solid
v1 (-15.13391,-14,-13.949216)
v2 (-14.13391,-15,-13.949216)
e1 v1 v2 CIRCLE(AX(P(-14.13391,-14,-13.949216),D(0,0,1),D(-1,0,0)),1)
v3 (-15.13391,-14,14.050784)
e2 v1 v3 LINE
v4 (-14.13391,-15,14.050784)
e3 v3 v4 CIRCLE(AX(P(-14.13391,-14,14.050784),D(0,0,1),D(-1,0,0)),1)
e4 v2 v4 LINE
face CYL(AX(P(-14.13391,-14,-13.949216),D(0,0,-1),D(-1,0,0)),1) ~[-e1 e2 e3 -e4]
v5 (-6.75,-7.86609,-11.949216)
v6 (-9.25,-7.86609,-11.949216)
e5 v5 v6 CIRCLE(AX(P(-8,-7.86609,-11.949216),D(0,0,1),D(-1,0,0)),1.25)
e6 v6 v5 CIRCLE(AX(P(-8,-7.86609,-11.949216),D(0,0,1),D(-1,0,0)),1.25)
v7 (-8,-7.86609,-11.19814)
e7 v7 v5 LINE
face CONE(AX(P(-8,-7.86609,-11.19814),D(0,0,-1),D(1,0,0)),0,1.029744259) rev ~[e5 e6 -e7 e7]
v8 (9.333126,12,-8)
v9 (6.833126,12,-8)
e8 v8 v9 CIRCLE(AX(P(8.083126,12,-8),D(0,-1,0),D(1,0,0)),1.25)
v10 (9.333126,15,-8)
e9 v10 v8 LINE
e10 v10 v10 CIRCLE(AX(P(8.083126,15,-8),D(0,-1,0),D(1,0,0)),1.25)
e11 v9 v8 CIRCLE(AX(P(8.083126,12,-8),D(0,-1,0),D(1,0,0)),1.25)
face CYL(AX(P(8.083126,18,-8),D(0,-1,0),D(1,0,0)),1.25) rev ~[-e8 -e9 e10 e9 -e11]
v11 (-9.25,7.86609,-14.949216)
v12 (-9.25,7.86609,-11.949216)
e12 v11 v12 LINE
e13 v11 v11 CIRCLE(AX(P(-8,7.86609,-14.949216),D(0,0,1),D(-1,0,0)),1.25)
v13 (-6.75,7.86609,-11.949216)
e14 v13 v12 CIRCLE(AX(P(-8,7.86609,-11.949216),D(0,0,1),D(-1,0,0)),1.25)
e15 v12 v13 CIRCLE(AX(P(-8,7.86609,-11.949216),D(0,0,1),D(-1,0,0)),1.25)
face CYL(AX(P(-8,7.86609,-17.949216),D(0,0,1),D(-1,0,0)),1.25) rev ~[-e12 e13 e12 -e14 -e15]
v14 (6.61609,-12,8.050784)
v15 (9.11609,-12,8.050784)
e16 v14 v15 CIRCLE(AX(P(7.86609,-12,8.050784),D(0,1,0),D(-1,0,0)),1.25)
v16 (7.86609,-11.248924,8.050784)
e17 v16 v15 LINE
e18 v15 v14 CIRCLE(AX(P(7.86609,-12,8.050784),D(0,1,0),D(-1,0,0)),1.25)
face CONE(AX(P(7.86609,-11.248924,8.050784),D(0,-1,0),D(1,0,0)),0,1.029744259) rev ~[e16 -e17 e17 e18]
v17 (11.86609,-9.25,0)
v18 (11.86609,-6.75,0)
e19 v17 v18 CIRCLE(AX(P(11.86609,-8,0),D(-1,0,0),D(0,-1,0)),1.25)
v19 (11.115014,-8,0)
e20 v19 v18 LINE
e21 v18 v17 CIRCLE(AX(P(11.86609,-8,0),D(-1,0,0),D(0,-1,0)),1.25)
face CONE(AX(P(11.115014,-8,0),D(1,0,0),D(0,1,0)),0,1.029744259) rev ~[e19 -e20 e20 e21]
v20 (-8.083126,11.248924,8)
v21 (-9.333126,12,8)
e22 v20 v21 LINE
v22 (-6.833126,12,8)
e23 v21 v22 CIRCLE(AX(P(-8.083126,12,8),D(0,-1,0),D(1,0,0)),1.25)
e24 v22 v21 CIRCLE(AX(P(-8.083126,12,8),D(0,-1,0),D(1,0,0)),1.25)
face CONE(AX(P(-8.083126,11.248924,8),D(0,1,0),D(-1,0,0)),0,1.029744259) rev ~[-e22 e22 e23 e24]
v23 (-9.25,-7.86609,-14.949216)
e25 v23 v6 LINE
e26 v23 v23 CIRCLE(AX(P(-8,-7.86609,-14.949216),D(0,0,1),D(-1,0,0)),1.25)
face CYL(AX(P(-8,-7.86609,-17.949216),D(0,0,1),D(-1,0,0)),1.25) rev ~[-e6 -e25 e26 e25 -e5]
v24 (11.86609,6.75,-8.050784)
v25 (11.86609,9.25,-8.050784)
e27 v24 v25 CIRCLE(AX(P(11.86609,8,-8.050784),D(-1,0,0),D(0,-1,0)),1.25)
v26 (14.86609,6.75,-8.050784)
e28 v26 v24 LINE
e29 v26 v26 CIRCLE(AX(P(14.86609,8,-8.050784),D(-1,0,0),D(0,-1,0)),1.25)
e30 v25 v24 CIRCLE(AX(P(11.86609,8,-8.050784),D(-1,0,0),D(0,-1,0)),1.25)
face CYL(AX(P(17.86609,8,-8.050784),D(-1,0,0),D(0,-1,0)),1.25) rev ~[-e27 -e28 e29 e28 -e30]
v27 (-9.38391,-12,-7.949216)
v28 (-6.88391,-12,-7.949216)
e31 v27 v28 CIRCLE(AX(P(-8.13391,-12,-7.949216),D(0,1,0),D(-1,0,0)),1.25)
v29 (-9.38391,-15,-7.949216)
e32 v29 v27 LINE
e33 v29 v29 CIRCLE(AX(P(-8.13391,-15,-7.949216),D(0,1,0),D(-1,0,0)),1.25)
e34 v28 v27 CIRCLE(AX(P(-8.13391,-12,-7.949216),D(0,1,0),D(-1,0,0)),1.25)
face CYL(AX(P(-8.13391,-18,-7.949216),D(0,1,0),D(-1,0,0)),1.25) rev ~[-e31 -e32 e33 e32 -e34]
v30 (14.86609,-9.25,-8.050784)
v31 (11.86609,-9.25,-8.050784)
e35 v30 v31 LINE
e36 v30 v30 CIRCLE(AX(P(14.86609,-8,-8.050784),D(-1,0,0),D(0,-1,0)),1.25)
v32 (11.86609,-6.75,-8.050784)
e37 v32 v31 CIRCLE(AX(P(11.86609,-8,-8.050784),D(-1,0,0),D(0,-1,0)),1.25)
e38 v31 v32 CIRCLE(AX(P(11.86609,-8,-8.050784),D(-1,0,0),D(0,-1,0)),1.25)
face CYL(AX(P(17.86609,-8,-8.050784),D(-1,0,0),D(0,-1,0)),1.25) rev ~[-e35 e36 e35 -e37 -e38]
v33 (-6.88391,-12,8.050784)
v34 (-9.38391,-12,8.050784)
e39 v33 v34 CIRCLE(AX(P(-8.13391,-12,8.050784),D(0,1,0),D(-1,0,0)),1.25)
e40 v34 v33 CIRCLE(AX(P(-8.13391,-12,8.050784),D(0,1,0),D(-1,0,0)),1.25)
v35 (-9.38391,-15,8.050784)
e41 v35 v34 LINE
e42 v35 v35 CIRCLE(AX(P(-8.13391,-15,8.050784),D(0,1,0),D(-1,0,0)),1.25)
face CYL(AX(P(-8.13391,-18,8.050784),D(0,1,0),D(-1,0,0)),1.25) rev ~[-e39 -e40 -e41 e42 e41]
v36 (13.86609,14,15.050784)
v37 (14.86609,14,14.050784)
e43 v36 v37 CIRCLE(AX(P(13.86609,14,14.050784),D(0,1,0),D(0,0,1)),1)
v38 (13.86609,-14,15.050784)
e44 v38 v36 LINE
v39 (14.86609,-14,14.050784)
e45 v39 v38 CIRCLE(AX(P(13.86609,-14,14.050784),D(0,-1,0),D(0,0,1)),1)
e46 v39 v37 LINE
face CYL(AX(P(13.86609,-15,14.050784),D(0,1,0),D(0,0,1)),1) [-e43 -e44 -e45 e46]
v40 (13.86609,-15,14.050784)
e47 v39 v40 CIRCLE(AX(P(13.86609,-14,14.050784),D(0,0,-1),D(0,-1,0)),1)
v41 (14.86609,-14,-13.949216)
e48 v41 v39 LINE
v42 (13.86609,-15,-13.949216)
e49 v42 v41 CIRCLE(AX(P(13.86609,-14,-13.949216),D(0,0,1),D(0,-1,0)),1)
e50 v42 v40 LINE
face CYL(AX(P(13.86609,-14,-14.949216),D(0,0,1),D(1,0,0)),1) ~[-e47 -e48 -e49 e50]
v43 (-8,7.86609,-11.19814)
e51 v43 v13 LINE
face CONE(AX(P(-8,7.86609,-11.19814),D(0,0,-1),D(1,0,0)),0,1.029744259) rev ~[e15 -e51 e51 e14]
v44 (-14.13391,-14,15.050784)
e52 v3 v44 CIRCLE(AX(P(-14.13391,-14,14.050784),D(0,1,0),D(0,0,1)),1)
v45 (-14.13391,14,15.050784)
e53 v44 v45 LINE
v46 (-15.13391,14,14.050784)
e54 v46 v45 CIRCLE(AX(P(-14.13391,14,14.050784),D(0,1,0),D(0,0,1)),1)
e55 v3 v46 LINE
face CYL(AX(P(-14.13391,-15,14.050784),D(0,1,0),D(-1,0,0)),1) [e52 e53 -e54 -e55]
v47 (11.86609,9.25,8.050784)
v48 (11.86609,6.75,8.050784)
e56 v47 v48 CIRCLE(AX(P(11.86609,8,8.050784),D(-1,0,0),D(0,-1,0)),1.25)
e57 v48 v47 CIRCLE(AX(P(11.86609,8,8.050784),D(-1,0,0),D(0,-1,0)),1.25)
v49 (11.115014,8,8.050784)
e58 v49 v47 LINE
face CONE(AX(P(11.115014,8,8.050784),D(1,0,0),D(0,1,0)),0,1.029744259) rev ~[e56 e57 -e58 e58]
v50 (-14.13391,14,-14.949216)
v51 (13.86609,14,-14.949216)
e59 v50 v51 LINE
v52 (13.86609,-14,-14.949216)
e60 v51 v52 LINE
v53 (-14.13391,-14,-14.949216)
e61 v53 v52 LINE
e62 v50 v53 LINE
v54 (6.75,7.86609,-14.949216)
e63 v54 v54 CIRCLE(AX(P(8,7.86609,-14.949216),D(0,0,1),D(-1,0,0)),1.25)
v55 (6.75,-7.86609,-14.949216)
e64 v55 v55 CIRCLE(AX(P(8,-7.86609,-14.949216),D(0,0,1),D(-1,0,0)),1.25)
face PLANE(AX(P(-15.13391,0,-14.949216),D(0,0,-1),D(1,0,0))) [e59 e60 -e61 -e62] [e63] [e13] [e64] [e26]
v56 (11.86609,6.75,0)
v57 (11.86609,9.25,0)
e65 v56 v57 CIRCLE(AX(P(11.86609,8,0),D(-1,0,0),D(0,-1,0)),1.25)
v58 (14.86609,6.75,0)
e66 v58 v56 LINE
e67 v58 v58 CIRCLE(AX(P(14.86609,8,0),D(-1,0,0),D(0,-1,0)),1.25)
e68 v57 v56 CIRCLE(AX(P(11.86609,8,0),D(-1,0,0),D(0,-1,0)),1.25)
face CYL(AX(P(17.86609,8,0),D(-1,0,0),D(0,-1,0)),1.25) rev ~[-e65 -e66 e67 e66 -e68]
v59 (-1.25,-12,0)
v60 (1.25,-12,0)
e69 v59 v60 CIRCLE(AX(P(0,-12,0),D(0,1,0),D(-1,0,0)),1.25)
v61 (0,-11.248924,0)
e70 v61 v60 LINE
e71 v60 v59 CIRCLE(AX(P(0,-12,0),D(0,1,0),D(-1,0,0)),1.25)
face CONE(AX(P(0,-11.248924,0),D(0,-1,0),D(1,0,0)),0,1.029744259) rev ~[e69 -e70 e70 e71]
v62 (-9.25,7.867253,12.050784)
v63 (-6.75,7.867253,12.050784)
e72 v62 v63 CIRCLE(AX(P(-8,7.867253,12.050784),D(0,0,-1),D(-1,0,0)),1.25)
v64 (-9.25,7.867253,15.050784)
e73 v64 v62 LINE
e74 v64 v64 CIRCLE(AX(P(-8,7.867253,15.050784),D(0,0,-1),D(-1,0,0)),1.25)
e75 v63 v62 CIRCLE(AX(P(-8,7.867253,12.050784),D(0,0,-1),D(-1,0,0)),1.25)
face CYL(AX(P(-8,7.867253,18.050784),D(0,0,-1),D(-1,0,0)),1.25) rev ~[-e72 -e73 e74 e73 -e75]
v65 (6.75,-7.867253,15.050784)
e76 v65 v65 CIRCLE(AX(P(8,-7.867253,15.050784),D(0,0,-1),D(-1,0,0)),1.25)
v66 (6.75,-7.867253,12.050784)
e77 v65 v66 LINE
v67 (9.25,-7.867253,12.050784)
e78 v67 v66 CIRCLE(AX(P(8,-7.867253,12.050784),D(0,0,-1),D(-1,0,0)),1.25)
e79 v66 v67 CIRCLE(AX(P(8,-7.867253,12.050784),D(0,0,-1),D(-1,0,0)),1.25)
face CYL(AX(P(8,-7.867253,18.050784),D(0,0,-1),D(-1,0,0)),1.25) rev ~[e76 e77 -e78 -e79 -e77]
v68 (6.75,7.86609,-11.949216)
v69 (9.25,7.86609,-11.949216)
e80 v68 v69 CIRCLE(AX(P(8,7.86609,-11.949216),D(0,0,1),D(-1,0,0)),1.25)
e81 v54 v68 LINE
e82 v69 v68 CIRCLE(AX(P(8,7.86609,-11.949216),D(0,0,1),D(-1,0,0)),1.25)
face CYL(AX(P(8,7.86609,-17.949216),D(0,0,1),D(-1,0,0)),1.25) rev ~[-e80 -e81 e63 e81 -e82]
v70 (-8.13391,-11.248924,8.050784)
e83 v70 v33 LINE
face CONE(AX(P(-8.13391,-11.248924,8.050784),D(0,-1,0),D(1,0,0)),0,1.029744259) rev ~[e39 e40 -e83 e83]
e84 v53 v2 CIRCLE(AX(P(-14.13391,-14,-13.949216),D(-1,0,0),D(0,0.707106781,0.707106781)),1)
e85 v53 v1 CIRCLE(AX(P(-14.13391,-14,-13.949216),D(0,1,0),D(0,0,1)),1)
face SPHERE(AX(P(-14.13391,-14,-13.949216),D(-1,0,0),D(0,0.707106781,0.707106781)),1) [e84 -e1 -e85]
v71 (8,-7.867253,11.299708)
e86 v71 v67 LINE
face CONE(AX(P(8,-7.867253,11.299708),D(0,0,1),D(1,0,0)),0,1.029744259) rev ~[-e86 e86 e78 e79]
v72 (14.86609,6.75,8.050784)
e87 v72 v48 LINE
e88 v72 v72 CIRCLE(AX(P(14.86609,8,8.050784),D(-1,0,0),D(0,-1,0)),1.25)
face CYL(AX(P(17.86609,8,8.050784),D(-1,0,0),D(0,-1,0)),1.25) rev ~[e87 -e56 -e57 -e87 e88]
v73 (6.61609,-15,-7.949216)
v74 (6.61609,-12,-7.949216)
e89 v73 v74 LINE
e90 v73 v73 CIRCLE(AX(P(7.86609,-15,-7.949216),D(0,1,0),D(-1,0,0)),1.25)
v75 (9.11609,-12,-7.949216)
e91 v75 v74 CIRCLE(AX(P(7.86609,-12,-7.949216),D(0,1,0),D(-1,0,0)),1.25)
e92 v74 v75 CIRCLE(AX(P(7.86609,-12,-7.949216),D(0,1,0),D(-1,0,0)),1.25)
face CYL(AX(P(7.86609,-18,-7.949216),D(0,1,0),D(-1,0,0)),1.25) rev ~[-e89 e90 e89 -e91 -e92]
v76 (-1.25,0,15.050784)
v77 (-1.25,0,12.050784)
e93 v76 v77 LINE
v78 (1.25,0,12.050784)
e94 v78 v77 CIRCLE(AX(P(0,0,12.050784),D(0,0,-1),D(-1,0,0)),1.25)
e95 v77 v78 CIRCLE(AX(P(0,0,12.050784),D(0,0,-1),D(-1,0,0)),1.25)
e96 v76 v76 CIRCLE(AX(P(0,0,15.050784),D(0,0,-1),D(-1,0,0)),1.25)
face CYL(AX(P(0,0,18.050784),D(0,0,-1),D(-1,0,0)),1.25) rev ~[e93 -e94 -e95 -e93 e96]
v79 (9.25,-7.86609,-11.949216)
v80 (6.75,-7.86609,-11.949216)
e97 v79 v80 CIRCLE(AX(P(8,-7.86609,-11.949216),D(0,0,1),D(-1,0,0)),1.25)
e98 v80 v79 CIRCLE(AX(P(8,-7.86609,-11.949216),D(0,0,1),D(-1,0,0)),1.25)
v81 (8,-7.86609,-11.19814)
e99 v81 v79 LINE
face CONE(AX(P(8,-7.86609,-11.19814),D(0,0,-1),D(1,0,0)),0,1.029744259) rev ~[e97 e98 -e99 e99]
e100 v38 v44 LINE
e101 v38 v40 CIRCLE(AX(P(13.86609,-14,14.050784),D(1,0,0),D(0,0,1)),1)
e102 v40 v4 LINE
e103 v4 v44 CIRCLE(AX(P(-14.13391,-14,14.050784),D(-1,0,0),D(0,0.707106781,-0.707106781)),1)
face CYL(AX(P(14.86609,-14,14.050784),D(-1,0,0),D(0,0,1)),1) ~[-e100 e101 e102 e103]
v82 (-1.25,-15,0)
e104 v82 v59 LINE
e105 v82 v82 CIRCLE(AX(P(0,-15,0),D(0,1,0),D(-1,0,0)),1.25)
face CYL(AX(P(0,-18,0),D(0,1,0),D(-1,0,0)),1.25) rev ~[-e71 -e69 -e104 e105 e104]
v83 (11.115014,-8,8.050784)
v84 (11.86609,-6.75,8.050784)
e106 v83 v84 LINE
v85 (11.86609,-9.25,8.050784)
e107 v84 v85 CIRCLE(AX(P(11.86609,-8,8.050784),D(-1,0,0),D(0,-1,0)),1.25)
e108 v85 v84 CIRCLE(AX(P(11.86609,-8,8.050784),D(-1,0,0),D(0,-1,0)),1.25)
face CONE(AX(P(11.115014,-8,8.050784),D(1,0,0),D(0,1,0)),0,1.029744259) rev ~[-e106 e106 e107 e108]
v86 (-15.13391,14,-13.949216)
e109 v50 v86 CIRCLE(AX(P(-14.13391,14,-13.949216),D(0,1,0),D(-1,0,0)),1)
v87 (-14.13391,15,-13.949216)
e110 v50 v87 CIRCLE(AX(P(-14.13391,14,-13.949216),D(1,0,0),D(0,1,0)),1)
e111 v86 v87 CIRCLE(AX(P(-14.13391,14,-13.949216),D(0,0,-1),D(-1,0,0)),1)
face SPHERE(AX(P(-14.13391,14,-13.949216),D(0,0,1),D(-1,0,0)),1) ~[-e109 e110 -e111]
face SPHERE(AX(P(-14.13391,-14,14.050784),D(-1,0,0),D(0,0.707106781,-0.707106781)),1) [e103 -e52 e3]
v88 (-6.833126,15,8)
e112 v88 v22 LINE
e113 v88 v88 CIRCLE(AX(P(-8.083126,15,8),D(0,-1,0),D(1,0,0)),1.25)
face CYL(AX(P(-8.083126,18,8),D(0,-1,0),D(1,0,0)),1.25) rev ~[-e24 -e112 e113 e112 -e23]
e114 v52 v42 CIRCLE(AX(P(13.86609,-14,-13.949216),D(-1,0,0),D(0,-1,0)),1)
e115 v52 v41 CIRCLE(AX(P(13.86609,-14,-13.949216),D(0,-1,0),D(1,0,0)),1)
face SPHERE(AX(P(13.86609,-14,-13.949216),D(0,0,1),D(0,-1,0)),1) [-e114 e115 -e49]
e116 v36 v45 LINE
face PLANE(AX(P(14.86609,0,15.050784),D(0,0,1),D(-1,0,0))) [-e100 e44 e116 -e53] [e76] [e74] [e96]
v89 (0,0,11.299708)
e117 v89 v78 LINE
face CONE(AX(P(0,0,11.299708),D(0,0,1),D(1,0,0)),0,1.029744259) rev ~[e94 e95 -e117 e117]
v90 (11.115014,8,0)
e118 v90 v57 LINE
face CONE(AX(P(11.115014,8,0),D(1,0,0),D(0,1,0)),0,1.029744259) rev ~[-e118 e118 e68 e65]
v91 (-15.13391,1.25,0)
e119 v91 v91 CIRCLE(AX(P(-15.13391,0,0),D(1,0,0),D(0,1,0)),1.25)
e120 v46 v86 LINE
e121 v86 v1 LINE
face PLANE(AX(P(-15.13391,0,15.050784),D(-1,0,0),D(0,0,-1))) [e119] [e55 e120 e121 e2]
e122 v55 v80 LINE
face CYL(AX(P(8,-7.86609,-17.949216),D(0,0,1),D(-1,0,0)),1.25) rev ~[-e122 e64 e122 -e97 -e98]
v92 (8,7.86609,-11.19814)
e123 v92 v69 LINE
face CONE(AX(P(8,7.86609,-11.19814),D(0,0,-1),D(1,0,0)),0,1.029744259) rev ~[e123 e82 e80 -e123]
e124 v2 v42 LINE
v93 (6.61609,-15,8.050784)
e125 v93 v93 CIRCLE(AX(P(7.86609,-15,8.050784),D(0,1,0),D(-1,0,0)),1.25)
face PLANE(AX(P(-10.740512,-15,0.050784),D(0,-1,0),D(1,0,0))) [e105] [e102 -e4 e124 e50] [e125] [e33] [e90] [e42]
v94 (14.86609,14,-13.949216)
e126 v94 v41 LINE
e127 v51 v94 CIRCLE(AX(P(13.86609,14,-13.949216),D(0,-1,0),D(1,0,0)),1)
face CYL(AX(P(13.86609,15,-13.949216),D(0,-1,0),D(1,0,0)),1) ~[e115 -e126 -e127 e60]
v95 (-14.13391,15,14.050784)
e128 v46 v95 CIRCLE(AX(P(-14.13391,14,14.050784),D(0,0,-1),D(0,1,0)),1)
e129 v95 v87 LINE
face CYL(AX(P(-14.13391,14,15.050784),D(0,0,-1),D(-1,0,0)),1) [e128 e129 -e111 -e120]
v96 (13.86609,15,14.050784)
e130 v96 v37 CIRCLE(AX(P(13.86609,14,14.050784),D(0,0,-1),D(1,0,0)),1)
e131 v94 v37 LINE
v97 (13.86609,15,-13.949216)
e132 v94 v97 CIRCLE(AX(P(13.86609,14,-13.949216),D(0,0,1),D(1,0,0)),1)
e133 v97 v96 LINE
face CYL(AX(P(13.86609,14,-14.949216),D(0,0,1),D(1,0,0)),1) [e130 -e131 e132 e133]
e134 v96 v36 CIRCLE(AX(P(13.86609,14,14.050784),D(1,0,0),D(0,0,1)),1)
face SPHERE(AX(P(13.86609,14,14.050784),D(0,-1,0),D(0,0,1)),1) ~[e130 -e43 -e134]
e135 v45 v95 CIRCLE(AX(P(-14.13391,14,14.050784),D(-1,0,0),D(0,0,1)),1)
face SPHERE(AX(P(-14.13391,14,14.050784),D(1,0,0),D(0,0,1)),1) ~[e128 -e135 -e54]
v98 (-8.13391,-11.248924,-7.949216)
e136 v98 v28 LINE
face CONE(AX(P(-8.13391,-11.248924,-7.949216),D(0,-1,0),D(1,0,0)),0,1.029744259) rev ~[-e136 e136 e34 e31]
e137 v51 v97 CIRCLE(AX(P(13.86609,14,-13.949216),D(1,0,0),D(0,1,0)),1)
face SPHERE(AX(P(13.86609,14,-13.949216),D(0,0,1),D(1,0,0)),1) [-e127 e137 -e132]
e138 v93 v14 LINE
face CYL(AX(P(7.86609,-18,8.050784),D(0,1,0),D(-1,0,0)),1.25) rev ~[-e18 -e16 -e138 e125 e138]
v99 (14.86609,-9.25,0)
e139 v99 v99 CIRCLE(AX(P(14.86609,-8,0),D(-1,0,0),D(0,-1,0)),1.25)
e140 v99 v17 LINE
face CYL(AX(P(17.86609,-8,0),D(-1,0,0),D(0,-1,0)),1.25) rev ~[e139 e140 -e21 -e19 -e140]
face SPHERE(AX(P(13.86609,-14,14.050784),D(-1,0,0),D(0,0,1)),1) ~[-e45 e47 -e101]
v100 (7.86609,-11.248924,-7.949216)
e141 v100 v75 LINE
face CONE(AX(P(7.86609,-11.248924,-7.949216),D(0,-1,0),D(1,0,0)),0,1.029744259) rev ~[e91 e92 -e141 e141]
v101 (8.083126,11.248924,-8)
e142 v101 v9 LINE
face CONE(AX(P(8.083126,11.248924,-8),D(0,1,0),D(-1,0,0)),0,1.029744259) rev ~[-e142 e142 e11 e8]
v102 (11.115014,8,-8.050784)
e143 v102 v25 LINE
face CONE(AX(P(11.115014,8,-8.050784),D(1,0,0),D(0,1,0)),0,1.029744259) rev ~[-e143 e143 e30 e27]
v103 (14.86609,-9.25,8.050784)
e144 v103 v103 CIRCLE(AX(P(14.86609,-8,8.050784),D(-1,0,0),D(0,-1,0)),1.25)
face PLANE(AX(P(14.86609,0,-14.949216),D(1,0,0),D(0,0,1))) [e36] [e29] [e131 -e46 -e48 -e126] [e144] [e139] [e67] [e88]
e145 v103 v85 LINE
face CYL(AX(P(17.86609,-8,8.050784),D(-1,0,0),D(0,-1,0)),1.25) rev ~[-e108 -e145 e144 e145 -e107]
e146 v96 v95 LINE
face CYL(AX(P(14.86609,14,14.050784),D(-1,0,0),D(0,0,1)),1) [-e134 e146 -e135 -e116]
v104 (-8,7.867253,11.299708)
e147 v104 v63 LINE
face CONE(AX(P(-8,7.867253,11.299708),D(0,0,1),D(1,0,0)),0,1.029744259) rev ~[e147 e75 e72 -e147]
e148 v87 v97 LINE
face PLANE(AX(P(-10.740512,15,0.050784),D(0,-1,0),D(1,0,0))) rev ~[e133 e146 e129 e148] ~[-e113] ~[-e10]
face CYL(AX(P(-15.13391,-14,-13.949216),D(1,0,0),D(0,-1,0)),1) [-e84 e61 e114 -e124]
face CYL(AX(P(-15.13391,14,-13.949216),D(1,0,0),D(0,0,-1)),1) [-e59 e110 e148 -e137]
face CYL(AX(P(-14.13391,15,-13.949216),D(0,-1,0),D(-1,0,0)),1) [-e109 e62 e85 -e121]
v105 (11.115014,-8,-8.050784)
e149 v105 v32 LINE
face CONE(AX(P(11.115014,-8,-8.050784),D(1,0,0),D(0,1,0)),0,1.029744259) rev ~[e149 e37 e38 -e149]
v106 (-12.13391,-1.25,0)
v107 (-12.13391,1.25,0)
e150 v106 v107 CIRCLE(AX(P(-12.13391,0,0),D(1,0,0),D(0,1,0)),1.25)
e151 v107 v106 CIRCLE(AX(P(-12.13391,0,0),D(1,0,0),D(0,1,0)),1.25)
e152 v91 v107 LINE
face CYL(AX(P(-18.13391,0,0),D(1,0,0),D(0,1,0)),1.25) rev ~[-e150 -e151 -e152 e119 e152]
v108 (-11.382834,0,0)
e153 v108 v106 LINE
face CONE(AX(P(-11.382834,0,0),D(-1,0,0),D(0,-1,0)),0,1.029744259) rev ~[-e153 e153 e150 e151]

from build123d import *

# Parameters (mm, degrees)
F1_DEPTH     = 15
F2_R         = 1
F3_T1_DEPTH  = 28
F3_S5_W      = 1
F3_S5_H      = 1
F3_T6_DEPTH  = 1
F3_S11_W     = 1
F3_S11_H     = 1
F3_T12_DEPTH = 1
F10_D        = 2.5
F10_DEPTH    = 3
F10_TIP      = 0.7510757738
F11_D        = 2.5
F11_DEPTH    = 3
F11_TIP      = 0.7510757738
F12_D        = 2.5
F12_DEPTH    = 3
F12_TIP      = 0.7510757738
F13_D        = 2.5
F13_DEPTH    = 3
F13_TIP      = 0.7510757738
F14_D        = 2.5
F14_DEPTH    = 3
F14_TIP      = 0.7510757738
F15_D        = 2.5
F15_DEPTH    = 3
F15_TIP      = 0.7510757738


# Not quite as in the source:
# - a fillet or chamfer that OpenCascade refuses, or shapes differently, is made with other operations: its cross-section is extruded or revolved along the edge and cut away or added


with BuildPart() as f1:
    # F0 (on Front) → F1 (new body, symmetric)
    with BuildSketch(Plane.XZ):
        Polygon((-0.1339098811, 0.0507837534), (-15.1339098811, 15.0507837534), (-15.1339098811, -14.9492162466), align=None)
        Polygon((14.8660901189, 15.0507837534), (-15.1339098811, 15.0507837534), (-0.1339098811, 0.0507837534), align=None)
        Polygon((14.8660901189, -14.9492162466), (14.8660901189, 15.0507837534), (-0.1339098811, 0.0507837534), align=None)
        Polygon((-0.1339098811, 0.0507837534), (-15.1339098811, -14.9492162466), (14.8660901189, -14.9492162466), align=None)
    extrude(amount=F1_DEPTH, both=True)

    # F2
    f2_edges = [f1.edges().sort_by_distance(p)[0] for p in [
        (-0.13391, -15, 15.050784),
        (14.86609, 0, 15.050784),
        (-0.13391, 15, 15.050784),
        (-15.13391, 0, 15.050784),
        (-15.13391, 15, 0.050784),
        (14.86609, 15, 0.050784),
        (14.86609, -15, 0.050784),
        (-0.13391, -15, -14.949216),
        (14.86609, 0, -14.949216),
        (-15.13391, 0, -14.949216),
        (-0.13391, 15, -14.949216),
    ]]
    fillet(f2_edges, radius=F2_R)

    # F3: fillet of radius 1 on 1 edges, made by hand

    # F3_s2 → F3_t1 (cut)
    with BuildSketch(Plane.XY.offset(-13.9492162466)):
        with BuildLine():
            ThreePointArc((-15.1339098811, -14), (-14.8410166623, -14.7071067812), (-14.1339098811, -15))
            Line((-14.1339098811, -15), (-15.1339098811, -15))
            Line((-15.1339098811, -15), (-15.1339098811, -14))
        make_face()
    extrude(amount=F3_T1_DEPTH, mode=Mode.SUBTRACT)


with BuildPart() as f3_tool4:
    # F3_s5 → F3_t6 (new body)
    with BuildSketch(Plane.YZ.offset(-14.1339098811)):
        with Locations((-14.5, 14.5507837534)):
            Rectangle(F3_S5_W, F3_S5_H)
    extrude(amount=-F3_T6_DEPTH)

    # F3_s7 → F3_t8 (revolve, cut)
    with BuildSketch(Plane(origin=(-14.1339098811, -14, 14.0507837534), x_dir=(0, 0.7071067812, -0.7071067812), z_dir=(0, 0.7071067812, 0.7071067812))):
        with BuildLine():
            ThreePointArc((0, -1), (1, 0), (0, 1))
            Line((0, 1), (0, -1))
        make_face()
    revolve(axis=Axis((-14.1339098811, -14, 14.0507837534), (-1, 0, 0)), mode=Mode.SUBTRACT)


with BuildPart() as f1_1:
    add(f1.part)

    # F3_t3: cut F3_tool4
    add(f3_tool4.part, mode=Mode.SUBTRACT)


with BuildPart() as f3_tool10:
    # F3_s11 → F3_t12 (new body)
    with BuildSketch(Plane.YZ.offset(-14.1339098811)):
        with Locations((-14.5, -14.4492162466)):
            Rectangle(F3_S11_W, F3_S11_H)
    extrude(amount=-F3_T12_DEPTH)

    # F3_s13 → F3_t14 (revolve, cut)
    with BuildSketch(Plane(origin=(-14.1339098811, -14, -13.9492162466), x_dir=(0, 0.7071067812, 0.7071067812), z_dir=(0, -0.7071067812, 0.7071067812))):
        with BuildLine():
            ThreePointArc((0, -1), (1, 0), (0, 1))
            Line((0, 1), (0, -1))
        make_face()
    revolve(axis=Axis((-14.1339098811, -14, -13.9492162466), (-1, 0, 0)), mode=Mode.SUBTRACT)


with BuildPart() as f1_2:
    add(f1_1.part)

    # F3_t9: cut F3_tool10
    add(f3_tool10.part, mode=Mode.SUBTRACT)

    # F10
    with Locations(Plane(origin=(-15.1339098811, 0, 0), x_dir=(0, -1, 0), z_dir=(-1, 0, 0))):
        with Locations((0, 0)):
            Hole(F10_D / 2, depth=F10_DEPTH)
            with Locations((0, 0, -(F10_DEPTH + F10_TIP / 2))):  # 118° drill point
                Cone(0, F10_D / 2, F10_TIP, mode=Mode.SUBTRACT)

    # F11
    with Locations(Plane(origin=(0, 15, 0), x_dir=(-1, 0, 0), z_dir=(0, 1, 0))):
        with Locations((8.0831261277, 8), (-8.0831261277, -8)):
            Hole(F11_D / 2, depth=F11_DEPTH)
            with Locations((0, 0, -(F11_DEPTH + F11_TIP / 2))):  # 118° drill point
                Cone(0, F11_D / 2, F11_TIP, mode=Mode.SUBTRACT)

    # F12
    with Locations(Plane.XY.offset(15.0507837534)):
        with Locations((-8, 7.8672532922), (0, 0), (8, -7.8672532922)):
            Hole(F12_D / 2, depth=F12_DEPTH)
            with Locations((0, 0, -(F12_DEPTH + F12_TIP / 2))):  # 118° drill point
                Cone(0, F12_D / 2, F12_TIP, mode=Mode.SUBTRACT)

    # F13
    with Locations(Plane(origin=(0, 0, -14.9492162466), x_dir=(1, 0, 0), z_dir=(0, 0, -1))):
        with Locations((-8, 7.8660901189), (8, 7.8660901189), (8, -7.8660901189), (-8, -7.8660901189)):
            Hole(F13_D / 2, depth=F13_DEPTH)
            with Locations((0, 0, -(F13_DEPTH + F13_TIP / 2))):  # 118° drill point
                Cone(0, F13_D / 2, F13_TIP, mode=Mode.SUBTRACT)

    # F14
    with Locations(Plane.YZ.offset(14.8660901189)):
        with Locations((-8, 8.0507837534), (-8, 0), (-8, -8.0507837534), (8, -8.0507837534), (8, 0), (8, 8.0507837534)):
            Hole(F14_D / 2, depth=F14_DEPTH)
            with Locations((0, 0, -(F14_DEPTH + F14_TIP / 2))):  # 118° drill point
                Cone(0, F14_D / 2, F14_TIP, mode=Mode.SUBTRACT)

    # F15
    with Locations(Plane.XZ.offset(15)):
        with Locations((-8.1339098811, 8.0507837534), (0, 0), (7.8660901189, 8.0507837534), (7.8660901189, -7.9492162466), (-8.1339098811, -7.9492162466)):
            Hole(F15_D / 2, depth=F15_DEPTH)
            with Locations((0, 0, -(F15_DEPTH + F15_TIP / 2))):  # 118° drill point
                Cone(0, F15_D / 2, F15_TIP, mode=Mode.SUBTRACT)


solid = f1_2.part
